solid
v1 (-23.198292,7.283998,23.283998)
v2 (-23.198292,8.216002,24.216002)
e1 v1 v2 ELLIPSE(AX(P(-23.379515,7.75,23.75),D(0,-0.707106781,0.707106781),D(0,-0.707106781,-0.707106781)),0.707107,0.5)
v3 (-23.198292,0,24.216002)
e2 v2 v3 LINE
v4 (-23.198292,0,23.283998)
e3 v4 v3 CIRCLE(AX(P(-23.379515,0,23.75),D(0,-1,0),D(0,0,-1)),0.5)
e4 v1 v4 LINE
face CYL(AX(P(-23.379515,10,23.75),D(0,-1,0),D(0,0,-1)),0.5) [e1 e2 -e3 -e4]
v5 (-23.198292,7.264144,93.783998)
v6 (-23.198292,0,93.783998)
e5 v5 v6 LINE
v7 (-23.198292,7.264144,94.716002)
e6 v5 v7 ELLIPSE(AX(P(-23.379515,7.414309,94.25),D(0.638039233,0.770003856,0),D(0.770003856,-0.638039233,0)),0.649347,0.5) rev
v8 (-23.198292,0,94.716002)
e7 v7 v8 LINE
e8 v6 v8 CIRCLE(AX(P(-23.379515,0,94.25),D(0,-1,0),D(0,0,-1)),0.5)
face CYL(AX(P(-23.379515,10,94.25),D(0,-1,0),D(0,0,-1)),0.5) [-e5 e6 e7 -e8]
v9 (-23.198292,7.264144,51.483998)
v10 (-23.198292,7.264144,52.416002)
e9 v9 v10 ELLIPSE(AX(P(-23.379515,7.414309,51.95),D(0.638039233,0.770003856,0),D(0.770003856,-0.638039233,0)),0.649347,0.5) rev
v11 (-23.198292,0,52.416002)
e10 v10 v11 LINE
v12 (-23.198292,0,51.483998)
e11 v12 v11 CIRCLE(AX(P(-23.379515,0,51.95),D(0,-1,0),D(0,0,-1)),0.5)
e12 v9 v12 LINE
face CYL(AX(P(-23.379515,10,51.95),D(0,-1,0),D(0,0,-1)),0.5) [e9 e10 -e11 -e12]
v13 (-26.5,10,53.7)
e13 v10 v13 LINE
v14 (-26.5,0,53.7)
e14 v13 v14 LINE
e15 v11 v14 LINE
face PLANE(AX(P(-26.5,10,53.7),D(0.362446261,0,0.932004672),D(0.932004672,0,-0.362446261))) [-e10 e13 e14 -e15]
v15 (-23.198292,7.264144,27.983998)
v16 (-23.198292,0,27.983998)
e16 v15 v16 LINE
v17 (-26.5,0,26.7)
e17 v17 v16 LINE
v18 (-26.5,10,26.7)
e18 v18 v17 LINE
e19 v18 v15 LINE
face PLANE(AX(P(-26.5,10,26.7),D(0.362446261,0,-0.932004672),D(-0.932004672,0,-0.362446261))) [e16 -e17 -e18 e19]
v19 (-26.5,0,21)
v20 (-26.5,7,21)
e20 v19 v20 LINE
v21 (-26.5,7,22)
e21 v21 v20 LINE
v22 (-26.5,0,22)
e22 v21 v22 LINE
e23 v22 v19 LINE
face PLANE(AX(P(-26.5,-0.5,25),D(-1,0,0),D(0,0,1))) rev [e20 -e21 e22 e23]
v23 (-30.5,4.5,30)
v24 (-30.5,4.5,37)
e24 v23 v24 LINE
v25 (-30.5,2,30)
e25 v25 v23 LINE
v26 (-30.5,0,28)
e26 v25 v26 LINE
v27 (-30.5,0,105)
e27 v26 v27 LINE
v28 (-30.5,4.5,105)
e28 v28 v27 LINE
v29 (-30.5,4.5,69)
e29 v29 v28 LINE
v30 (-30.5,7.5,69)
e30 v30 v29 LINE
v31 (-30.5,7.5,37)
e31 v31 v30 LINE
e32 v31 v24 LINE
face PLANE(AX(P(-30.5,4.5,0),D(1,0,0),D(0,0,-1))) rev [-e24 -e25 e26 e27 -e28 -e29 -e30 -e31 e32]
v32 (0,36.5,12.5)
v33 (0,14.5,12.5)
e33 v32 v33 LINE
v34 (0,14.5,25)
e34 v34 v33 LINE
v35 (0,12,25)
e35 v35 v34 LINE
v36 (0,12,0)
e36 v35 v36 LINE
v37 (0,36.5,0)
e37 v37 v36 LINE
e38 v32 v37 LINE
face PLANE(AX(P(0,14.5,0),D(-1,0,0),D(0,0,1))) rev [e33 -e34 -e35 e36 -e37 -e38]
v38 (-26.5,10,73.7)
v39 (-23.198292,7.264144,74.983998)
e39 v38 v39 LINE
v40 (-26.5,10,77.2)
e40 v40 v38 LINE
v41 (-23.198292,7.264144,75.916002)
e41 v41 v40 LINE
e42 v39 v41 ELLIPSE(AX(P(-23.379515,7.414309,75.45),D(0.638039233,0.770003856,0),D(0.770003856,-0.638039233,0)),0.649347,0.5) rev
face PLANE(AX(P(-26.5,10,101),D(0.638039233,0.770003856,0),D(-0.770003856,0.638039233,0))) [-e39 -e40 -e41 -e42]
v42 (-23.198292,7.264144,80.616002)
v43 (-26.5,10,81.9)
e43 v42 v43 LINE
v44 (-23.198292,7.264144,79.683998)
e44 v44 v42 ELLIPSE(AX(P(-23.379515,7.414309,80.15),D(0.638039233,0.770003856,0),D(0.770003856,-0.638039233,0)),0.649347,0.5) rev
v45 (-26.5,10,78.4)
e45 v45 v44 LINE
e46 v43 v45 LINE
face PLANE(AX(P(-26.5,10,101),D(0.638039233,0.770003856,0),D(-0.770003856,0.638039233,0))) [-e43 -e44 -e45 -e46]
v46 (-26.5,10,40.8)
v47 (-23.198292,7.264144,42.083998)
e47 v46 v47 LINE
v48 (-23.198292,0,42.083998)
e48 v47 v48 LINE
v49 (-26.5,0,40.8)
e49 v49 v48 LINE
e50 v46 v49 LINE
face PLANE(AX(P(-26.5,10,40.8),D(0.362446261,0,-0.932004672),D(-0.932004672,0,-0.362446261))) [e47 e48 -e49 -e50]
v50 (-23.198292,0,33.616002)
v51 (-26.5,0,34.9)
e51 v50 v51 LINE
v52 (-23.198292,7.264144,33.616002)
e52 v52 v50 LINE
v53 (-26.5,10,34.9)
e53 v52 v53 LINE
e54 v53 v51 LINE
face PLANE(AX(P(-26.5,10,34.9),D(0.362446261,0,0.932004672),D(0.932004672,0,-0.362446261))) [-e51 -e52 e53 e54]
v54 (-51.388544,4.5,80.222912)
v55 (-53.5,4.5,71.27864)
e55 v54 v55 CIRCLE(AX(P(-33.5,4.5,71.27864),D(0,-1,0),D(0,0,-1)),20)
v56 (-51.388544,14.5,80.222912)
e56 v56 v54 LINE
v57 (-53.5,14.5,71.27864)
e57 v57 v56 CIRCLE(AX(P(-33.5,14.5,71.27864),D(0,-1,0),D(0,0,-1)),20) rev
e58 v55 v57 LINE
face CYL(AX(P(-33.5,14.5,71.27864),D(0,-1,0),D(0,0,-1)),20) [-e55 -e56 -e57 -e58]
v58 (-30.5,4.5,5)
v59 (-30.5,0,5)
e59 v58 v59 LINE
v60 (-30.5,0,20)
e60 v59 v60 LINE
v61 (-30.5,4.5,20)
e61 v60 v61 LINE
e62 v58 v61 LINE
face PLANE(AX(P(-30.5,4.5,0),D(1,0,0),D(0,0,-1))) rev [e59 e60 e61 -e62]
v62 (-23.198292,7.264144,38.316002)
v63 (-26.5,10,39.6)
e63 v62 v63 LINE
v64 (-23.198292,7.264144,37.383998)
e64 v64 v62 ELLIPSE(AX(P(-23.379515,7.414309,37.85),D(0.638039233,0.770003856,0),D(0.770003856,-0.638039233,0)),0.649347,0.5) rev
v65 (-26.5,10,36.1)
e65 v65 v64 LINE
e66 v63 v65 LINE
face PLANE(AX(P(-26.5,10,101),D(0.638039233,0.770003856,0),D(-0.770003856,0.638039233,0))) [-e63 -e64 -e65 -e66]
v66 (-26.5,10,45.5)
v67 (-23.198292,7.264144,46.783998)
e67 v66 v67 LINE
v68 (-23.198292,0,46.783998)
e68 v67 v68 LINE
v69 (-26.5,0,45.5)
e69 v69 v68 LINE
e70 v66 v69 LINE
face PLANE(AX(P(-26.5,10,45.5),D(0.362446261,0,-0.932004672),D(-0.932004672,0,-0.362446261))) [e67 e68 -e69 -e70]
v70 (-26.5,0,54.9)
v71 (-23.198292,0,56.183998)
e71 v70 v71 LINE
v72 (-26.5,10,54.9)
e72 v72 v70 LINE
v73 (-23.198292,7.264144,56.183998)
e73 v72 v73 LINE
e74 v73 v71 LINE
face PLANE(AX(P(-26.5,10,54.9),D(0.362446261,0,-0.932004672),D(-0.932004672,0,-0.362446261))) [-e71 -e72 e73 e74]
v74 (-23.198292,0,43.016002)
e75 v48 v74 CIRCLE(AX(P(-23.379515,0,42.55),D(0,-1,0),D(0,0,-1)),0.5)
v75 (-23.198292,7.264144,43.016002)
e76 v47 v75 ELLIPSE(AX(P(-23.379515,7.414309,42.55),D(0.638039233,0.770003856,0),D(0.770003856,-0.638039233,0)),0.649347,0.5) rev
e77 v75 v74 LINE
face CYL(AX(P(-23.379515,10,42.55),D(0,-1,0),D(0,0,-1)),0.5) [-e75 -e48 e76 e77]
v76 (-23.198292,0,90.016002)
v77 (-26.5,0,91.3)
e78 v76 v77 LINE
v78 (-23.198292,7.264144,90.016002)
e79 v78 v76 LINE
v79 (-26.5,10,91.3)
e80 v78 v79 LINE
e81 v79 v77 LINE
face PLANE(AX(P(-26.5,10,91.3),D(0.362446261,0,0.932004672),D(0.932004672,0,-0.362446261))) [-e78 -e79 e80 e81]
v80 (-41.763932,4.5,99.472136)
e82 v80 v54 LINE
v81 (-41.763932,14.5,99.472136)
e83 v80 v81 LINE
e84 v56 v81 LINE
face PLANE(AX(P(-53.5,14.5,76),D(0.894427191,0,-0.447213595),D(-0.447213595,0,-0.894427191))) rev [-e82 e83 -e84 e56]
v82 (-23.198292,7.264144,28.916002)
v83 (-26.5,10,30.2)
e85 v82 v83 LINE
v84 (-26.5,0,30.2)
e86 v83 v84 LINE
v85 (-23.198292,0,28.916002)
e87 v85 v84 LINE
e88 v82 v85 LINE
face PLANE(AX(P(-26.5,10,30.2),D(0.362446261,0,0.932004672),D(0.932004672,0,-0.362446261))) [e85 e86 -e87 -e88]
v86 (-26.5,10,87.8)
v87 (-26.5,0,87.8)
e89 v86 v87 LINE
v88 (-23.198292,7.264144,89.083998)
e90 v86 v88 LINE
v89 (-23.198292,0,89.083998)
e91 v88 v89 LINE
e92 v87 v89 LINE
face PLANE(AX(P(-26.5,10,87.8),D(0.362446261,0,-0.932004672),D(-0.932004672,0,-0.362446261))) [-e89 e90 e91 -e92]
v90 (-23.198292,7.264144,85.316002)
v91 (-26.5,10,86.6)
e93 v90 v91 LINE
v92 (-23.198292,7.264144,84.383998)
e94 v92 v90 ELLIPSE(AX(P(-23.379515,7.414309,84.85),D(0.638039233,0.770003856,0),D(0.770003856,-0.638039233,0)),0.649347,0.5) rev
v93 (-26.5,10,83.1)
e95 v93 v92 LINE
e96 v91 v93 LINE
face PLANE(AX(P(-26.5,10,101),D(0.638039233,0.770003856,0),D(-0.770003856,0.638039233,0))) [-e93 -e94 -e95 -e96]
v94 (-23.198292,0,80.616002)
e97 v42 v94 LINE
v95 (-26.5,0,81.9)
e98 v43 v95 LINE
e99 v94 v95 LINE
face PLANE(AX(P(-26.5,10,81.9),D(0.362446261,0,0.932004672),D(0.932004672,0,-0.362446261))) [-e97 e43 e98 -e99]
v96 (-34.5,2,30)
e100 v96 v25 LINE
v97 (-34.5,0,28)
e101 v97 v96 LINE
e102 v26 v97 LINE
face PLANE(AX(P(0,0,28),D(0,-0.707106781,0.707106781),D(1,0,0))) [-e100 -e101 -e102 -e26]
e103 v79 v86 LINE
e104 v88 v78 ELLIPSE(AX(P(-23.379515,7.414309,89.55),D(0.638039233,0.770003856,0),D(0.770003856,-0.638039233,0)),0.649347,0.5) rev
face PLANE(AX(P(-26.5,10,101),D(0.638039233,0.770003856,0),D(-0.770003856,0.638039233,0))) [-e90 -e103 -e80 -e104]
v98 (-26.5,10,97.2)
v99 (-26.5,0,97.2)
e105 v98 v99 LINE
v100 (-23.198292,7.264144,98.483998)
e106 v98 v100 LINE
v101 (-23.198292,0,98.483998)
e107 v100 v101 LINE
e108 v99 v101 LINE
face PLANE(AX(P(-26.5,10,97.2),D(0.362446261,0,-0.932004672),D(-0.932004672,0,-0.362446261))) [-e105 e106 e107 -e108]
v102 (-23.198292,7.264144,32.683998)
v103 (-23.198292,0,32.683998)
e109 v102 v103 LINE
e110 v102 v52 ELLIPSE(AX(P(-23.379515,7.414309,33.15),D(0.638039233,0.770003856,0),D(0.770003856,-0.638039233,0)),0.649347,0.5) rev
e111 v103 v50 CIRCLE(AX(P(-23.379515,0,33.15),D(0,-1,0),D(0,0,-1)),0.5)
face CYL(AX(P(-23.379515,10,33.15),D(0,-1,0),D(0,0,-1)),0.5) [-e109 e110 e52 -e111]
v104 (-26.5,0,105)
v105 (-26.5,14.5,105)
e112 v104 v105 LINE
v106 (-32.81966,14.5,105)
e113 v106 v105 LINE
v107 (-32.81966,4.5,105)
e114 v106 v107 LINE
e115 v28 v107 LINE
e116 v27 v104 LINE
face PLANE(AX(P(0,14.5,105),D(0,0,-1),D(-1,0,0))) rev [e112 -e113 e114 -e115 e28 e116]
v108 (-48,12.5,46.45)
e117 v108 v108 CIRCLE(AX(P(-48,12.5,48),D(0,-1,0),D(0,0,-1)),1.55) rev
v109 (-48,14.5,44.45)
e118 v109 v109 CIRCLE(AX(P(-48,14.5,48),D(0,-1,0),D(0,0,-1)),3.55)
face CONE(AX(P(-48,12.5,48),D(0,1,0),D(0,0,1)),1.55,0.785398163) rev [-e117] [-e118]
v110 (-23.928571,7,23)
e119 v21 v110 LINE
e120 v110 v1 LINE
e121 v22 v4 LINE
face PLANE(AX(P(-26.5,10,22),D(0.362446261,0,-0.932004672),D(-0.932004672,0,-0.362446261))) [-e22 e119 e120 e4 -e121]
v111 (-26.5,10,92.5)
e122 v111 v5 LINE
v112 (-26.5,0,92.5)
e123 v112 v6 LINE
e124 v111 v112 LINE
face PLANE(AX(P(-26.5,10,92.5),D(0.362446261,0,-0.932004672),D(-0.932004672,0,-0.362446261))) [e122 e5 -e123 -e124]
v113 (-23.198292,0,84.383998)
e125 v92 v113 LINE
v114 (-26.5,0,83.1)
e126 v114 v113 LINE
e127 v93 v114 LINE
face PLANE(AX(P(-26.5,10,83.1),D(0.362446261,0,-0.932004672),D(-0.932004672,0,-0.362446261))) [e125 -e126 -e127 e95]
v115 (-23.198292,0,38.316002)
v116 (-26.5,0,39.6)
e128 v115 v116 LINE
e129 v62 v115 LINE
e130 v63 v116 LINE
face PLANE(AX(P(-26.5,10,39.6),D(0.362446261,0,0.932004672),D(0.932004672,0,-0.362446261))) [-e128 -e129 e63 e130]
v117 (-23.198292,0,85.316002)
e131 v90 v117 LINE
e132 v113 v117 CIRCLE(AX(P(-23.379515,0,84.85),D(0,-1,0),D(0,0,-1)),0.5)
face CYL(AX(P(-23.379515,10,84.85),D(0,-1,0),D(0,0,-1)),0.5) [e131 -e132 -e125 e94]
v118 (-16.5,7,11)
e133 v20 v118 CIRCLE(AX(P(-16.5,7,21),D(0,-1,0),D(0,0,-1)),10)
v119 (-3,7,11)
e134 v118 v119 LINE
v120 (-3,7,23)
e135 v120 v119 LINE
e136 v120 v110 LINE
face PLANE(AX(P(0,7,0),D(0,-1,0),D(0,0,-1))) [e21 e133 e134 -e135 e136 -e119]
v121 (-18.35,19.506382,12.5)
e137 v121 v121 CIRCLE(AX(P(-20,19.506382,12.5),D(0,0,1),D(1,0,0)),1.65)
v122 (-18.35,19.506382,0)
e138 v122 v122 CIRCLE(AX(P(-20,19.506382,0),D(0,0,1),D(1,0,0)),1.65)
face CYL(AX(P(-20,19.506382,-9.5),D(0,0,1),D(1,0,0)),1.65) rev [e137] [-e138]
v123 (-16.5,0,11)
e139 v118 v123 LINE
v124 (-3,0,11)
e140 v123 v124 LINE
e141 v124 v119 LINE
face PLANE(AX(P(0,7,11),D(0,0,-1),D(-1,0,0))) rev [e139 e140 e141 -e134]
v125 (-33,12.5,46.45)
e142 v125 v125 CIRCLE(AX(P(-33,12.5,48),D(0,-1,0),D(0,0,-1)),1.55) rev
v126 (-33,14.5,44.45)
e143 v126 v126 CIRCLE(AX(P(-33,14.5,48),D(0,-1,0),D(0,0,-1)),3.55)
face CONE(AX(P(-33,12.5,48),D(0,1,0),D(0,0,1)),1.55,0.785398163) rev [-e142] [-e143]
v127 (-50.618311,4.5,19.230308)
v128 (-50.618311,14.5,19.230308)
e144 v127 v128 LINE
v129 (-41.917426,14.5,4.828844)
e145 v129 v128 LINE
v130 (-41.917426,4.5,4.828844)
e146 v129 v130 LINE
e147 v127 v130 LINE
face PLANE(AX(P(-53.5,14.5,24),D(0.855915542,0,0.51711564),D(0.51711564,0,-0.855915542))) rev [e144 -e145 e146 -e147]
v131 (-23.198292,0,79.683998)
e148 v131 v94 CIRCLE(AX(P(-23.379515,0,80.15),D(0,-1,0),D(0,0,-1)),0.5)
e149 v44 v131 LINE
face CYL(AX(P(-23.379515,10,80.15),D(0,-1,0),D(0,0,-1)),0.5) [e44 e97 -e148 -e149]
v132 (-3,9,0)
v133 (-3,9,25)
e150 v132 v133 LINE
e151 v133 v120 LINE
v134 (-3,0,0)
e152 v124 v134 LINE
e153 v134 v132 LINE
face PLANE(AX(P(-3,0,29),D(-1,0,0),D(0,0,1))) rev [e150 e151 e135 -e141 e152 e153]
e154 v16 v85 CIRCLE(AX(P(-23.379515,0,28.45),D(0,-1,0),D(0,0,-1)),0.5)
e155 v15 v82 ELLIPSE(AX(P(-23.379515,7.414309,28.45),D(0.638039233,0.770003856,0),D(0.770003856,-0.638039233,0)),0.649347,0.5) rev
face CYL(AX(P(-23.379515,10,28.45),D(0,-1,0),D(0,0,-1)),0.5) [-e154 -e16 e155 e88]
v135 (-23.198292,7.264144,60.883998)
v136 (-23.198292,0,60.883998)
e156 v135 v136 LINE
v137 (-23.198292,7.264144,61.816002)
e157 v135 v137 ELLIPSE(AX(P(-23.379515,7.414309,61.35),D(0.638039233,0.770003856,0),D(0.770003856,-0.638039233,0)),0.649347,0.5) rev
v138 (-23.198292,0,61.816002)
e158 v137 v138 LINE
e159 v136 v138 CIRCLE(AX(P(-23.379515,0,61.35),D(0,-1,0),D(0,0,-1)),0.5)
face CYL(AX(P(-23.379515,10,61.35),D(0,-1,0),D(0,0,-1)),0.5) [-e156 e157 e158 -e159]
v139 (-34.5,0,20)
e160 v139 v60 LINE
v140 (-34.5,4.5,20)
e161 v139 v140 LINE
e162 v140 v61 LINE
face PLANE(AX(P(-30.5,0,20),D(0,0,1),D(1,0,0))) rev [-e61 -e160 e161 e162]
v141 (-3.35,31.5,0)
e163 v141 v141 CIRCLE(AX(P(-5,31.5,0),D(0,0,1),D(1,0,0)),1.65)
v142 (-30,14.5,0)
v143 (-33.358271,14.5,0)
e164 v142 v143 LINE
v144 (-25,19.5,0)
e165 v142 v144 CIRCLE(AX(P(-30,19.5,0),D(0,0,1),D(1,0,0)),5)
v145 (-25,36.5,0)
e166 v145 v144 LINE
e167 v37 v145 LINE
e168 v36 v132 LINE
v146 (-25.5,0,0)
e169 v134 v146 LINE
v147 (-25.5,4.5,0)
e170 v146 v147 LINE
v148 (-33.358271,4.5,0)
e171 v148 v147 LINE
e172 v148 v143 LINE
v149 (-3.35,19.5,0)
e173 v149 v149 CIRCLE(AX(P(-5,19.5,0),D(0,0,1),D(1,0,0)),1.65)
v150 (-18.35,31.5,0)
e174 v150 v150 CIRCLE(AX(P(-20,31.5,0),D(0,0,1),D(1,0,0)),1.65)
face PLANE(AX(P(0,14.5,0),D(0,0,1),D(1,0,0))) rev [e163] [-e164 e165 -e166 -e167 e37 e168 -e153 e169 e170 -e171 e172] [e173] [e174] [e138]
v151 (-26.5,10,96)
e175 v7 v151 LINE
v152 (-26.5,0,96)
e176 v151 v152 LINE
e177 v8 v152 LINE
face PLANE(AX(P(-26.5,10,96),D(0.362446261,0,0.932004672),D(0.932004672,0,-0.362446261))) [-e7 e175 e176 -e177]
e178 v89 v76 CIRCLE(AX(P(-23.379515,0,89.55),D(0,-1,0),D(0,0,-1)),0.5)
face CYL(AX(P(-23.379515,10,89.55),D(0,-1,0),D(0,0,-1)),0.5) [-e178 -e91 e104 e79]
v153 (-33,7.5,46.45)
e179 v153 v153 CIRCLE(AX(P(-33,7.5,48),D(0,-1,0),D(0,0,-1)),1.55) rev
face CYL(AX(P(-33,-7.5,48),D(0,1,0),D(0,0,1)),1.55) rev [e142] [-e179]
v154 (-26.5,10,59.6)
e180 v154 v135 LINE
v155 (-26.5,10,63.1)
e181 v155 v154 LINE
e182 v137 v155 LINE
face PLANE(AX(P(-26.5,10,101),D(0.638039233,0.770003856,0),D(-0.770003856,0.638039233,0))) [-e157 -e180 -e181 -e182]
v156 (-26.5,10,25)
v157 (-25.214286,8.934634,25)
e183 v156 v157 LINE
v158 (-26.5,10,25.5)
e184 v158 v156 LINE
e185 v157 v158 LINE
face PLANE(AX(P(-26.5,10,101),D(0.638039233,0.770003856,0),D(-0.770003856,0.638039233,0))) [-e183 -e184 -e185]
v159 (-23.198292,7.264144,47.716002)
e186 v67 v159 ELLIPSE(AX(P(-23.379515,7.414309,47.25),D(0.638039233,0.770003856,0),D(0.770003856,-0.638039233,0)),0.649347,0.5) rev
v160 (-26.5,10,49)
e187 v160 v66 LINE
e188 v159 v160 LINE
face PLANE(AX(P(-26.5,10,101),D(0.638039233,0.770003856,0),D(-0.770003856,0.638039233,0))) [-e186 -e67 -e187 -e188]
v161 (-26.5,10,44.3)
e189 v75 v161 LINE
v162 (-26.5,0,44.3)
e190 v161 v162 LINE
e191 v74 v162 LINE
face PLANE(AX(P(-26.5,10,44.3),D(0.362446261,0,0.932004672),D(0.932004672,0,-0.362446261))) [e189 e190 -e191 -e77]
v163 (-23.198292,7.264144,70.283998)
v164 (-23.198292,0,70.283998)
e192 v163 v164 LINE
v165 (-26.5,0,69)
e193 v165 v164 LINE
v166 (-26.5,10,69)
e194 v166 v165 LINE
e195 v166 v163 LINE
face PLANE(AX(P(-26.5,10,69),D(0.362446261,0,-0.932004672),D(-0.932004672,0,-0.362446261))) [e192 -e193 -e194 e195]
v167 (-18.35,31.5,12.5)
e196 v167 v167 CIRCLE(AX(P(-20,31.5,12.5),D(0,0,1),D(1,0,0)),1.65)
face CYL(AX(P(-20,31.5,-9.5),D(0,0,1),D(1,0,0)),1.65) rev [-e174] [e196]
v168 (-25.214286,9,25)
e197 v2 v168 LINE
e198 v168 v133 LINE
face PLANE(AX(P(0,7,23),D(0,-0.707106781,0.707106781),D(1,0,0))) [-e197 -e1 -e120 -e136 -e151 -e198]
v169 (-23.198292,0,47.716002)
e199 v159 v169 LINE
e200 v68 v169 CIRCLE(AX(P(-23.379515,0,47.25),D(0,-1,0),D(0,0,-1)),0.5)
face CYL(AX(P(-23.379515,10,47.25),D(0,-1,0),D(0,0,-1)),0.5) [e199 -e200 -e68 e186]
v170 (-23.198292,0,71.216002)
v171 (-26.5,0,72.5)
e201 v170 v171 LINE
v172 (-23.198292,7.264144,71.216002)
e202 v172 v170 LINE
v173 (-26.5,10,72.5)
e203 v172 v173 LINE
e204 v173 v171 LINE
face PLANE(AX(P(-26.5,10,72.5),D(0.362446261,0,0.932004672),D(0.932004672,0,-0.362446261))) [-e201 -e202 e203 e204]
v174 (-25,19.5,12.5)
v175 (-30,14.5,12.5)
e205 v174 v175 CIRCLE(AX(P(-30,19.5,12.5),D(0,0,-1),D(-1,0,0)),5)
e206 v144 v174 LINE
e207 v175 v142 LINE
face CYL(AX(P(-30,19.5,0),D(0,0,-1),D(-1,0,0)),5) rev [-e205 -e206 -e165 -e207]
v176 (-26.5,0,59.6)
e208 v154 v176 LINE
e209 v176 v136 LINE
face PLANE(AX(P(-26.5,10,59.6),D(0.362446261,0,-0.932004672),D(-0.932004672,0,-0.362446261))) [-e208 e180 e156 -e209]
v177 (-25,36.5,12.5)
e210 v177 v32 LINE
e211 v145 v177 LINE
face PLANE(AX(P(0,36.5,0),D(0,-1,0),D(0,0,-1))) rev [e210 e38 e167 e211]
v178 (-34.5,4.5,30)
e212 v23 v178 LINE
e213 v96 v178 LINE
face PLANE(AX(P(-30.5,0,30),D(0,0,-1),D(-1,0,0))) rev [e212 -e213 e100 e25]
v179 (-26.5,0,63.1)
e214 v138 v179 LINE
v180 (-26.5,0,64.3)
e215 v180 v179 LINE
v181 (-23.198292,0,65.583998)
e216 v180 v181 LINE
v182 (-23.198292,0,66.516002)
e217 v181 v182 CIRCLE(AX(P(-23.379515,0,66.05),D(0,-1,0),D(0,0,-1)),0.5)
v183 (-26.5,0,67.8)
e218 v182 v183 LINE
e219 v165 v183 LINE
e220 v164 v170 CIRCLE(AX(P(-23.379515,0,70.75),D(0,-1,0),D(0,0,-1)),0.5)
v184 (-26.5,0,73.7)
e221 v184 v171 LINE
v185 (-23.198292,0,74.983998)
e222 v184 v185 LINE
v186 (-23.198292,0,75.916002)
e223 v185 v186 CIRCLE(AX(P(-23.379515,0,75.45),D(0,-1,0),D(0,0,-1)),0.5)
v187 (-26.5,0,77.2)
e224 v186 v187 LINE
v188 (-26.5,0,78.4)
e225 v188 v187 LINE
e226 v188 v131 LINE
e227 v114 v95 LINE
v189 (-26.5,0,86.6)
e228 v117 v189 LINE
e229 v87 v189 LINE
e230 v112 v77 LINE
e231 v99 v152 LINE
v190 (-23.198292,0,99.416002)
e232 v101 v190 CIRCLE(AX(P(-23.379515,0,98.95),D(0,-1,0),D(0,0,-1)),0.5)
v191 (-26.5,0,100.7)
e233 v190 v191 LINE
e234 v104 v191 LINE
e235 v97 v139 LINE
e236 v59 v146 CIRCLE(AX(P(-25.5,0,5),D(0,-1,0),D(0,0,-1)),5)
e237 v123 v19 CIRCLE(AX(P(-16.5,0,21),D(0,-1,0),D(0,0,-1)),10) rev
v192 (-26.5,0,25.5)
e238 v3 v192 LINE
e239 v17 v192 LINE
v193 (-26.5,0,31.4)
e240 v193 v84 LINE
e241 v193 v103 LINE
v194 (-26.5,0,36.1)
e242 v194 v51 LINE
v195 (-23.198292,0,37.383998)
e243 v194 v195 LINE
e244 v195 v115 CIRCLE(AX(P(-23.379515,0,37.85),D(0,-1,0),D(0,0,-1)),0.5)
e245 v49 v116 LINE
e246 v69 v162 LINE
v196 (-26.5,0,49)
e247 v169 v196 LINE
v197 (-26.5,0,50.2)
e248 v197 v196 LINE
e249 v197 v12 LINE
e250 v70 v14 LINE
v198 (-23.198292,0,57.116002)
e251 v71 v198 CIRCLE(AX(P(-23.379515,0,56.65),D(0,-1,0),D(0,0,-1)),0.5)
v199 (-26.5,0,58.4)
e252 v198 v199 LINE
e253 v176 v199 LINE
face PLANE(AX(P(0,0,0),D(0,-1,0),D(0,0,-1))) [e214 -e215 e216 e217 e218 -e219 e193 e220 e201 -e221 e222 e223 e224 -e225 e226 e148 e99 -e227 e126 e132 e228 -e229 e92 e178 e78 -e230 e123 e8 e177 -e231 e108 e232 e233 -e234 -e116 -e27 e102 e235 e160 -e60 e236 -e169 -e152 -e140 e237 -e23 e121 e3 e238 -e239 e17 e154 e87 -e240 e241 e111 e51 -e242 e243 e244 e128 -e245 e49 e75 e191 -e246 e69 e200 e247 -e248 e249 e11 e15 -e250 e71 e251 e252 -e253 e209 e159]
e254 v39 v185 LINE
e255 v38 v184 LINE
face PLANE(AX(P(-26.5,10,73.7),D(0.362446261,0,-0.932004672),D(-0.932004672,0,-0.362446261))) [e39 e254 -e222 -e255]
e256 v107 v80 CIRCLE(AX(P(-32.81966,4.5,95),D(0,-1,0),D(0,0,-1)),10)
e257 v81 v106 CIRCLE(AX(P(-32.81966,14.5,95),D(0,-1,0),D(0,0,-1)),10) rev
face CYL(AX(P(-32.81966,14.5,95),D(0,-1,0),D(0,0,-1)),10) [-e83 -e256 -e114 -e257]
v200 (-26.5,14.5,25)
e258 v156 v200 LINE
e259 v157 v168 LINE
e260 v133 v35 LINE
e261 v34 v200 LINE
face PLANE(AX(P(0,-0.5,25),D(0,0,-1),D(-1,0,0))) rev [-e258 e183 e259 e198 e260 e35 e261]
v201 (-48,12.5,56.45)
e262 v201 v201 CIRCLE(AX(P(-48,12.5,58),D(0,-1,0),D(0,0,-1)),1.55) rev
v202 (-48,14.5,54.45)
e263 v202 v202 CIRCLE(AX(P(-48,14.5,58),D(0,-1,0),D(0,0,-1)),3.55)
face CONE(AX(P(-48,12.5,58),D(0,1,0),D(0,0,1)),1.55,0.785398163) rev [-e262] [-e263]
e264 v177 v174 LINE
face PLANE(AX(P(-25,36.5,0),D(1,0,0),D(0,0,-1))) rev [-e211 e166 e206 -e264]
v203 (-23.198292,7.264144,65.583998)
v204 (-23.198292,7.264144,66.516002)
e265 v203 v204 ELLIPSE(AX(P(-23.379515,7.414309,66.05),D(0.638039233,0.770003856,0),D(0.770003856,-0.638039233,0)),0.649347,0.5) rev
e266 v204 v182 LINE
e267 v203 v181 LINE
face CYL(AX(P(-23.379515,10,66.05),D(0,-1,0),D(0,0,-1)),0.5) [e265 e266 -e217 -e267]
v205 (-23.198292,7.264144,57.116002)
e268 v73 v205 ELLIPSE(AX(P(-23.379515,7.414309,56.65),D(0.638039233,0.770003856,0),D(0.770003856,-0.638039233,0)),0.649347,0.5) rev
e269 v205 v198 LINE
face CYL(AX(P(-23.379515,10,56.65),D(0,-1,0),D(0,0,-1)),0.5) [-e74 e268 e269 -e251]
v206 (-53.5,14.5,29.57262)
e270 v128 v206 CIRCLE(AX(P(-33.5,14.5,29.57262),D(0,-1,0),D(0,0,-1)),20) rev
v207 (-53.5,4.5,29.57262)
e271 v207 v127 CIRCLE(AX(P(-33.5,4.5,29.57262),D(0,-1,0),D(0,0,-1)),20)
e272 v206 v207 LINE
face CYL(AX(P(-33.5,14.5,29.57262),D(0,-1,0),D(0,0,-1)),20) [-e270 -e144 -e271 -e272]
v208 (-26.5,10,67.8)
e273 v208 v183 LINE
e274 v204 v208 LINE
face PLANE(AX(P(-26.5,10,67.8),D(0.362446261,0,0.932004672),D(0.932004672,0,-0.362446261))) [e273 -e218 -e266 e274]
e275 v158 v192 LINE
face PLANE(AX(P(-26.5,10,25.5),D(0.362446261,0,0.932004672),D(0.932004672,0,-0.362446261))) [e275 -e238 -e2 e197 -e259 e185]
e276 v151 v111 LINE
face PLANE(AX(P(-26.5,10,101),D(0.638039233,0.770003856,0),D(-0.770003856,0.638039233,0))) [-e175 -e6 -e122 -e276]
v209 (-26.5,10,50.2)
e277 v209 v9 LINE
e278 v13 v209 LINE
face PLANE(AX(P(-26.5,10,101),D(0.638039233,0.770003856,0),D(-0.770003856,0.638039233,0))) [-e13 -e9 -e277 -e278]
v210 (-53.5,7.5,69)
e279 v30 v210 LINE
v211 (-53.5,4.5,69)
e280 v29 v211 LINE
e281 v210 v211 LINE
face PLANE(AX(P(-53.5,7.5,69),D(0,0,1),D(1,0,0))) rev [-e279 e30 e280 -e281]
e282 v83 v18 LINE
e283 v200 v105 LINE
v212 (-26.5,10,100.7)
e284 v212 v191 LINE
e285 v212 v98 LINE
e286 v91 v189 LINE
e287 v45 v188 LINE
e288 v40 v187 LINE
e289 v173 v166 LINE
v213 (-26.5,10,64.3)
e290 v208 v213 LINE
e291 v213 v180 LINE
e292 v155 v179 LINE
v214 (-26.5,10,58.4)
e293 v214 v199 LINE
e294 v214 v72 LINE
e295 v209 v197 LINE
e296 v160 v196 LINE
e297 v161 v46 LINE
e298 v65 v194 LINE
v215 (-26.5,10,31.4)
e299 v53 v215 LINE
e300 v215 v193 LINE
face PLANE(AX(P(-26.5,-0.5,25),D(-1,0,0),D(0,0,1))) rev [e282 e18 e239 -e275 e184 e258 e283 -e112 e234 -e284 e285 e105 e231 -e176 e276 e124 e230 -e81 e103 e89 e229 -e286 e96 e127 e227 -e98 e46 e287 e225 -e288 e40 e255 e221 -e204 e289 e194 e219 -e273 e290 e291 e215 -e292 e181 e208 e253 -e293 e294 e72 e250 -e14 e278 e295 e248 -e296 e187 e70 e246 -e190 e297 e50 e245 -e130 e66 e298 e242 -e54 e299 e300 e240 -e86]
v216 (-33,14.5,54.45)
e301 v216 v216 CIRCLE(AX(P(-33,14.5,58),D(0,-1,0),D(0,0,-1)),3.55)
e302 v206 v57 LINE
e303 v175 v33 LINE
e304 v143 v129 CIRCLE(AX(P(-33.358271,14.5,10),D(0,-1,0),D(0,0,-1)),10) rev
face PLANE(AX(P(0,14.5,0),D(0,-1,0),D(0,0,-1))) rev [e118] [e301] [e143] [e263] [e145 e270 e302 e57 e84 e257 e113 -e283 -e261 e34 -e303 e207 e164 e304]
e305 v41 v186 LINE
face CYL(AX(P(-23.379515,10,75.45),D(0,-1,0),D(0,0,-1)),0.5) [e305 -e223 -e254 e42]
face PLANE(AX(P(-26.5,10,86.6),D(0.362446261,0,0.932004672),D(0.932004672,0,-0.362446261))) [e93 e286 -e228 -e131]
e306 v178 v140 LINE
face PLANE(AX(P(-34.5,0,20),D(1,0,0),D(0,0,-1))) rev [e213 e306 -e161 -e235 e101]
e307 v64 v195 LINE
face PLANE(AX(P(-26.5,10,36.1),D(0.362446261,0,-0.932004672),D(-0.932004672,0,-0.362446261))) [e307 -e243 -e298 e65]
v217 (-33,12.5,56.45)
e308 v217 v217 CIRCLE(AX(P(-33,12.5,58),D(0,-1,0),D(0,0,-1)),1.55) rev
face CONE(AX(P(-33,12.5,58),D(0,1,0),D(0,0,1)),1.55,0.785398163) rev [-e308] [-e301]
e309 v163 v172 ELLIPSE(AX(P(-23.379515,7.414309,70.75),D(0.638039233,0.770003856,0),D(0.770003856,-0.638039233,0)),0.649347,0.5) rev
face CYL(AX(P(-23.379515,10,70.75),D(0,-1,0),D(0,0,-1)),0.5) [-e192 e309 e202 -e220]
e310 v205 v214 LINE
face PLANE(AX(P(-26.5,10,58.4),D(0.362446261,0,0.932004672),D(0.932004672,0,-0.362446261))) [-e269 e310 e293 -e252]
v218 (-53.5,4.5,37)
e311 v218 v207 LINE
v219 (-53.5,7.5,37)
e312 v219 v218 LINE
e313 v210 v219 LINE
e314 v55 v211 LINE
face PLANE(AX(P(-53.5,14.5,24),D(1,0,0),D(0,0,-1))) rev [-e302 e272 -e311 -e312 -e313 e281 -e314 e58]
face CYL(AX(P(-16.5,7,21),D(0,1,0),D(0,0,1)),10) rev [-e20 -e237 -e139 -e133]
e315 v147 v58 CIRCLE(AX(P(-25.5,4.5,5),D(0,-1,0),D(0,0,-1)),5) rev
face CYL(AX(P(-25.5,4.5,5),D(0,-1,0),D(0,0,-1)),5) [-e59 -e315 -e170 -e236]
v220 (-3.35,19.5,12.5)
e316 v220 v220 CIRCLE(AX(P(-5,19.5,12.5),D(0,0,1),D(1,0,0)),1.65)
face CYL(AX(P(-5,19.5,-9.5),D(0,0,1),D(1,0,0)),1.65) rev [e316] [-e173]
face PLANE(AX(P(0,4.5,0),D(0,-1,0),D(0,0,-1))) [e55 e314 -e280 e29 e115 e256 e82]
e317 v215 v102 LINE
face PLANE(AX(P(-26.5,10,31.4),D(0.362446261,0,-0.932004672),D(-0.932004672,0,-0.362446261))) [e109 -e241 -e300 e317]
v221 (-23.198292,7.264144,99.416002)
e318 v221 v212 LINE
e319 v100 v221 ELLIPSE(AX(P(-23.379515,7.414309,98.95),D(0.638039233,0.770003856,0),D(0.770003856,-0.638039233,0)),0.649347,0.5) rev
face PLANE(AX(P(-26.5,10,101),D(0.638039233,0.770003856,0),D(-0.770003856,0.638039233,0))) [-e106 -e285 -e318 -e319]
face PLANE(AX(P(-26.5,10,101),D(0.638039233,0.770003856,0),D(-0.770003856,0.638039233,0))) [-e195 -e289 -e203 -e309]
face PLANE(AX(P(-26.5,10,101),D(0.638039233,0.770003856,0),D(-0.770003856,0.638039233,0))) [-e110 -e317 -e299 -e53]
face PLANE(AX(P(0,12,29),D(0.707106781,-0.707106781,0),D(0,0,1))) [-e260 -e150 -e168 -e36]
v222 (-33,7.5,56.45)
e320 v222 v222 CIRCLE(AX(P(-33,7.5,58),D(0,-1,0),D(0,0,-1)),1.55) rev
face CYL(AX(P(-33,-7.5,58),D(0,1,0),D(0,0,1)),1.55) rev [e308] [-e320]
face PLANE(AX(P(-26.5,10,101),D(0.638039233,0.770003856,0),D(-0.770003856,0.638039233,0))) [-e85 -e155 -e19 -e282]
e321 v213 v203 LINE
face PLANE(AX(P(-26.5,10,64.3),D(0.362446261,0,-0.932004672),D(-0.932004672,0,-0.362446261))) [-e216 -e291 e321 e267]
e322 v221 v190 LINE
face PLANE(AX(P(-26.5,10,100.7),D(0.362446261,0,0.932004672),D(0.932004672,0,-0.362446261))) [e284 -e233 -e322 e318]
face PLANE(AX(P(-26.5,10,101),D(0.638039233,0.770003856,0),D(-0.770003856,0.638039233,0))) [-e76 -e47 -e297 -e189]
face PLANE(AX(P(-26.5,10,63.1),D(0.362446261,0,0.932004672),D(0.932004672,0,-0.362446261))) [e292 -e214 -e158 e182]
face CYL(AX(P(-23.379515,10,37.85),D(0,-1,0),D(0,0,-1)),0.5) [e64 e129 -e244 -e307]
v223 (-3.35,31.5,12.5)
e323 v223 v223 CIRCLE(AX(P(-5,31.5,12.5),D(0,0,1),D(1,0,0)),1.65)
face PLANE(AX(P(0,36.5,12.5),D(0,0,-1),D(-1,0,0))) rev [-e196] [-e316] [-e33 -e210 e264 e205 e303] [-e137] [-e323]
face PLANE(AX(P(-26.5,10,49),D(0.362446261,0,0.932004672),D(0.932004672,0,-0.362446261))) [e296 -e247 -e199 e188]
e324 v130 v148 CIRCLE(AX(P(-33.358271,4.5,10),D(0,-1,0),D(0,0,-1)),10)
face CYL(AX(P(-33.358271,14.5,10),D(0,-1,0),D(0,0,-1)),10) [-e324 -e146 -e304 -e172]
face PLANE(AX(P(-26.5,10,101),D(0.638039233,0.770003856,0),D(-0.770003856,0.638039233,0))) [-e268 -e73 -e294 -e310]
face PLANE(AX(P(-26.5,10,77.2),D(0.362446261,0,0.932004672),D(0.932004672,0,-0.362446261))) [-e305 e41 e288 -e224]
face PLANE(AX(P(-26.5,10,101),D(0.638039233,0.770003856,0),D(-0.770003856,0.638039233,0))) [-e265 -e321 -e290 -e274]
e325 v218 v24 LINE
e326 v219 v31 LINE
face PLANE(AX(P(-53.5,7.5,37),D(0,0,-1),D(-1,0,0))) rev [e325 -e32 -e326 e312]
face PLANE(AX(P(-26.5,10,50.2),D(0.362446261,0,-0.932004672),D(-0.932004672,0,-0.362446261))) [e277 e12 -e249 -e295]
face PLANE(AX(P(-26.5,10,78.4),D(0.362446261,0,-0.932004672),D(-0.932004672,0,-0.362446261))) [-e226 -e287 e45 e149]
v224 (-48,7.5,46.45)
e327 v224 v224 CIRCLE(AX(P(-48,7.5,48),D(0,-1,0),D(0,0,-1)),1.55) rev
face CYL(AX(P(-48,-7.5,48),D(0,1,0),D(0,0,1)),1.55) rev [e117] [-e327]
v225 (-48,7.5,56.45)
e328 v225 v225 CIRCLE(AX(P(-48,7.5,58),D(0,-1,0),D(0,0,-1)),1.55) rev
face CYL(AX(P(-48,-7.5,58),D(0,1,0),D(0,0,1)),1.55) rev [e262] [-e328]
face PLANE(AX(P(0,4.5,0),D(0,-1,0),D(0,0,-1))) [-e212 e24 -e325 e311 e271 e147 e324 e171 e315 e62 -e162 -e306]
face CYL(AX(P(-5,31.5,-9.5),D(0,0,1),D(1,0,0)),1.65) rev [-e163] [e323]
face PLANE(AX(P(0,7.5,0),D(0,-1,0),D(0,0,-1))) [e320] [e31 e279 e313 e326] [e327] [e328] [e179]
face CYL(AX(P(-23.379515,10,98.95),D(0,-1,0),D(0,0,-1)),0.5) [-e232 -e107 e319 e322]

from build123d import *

# Parameters (mm, degrees)
BOSS_EXTRUDE1_DEPTH = 14.5
SKETCH2_W           = 26.5
SKETCH2_H           = 80
CUT_EXTRUDE1_DEPTH  = 15
SKETCH4_W           = 26.5
SKETCH4_H           = 14
CUT_EXTRUDE2_DEPTH  = 7
FILLET1_R           = 10
SKETCH5_W           = 3
SKETCH5_H           = 12
CUT_EXTRUDE3_DEPTH  = 29
CHAMFER1_SIZE       = 3
CHAMFER2_SIZE       = 2
BOSS_EXTRUDE2_DEPTH = 10
LPATTERN1_COUNT     = 17
LPATTERN1_PITCH     = 4.7
CUT_EXTRUDE4_DEPTH  = 76
SKETCH8_W           = 33.454520386
SKETCH8_H           = 107.037620526
CUT_EXTRUDE5_DEPTH  = 4.5
FILLET2_R           = 20
FILLET3_R           = 10
SKETCH9_W           = 25
SKETCH9_H           = 12.5
BOSS_EXTRUDE3_DEPTH = 22
FILLET4_R           = 5
SKETCH10_R          = 1.65
CUT_EXTRUDE6_DEPTH  = 22
SKETCH12_R          = 1.55
CUT_EXTRUDE7_DEPTH  = 22
CHAMFER3_SIZE       = 2
SKETCH13_W          = 23
SKETCH13_H          = 32
CUT_EXTRUDE8_DEPTH  = 3
FILLET5_R           = 5
SKETCH14_W          = 4
SKETCH14_H          = 10
BOSS_EXTRUDE4_DEPTH = 4.5
CHAMFER4_SIZE       = 2


with BuildPart() as part:
    # Sketch1 → Boss-Extrude1 (new body)
    with BuildSketch(Plane(origin=(0, 0, 0), x_dir=(1, 0, 0), z_dir=(0, 1, 0))):
        Polygon((-53.5, -24), (-39, 0), (0, 0), (0, -105), (-39, -105), (-53.5, -76), align=None)
    extrude(amount=BOSS_EXTRUDE1_DEPTH)

    # Sketch2 → Cut-Extrude1 (cut)
    with BuildSketch(Plane(origin=(0, 14.5, 0), x_dir=(1, 0, 0), z_dir=(0, 1, 0))):
        with Locations((-13.25, -65)):
            Rectangle(SKETCH2_W, SKETCH2_H)
    extrude(amount=-CUT_EXTRUDE1_DEPTH, mode=Mode.SUBTRACT)

    # Sketch4 → Cut-Extrude2 (cut)
    with BuildSketch(Plane.XZ):
        with Locations((-13.25, 18)):
            Rectangle(SKETCH4_W, SKETCH4_H)
    extrude(amount=-CUT_EXTRUDE2_DEPTH, mode=Mode.SUBTRACT)

    # Fillet1
    fillet1_edges = [part.edges().sort_by_distance(p)[0] for p in [
        (-26.5, 3.5, 11),
    ]]
    fillet(fillet1_edges, radius=FILLET1_R)

    # Sketch5 → Cut-Extrude3 (cut)
    with BuildSketch(Plane(origin=(0, 0, 0), x_dir=(-1, 0, 0), z_dir=(0, 0, -1))):
        with Locations((1.5, 6)):
            Rectangle(SKETCH5_W, SKETCH5_H)
    extrude(amount=-CUT_EXTRUDE3_DEPTH, mode=Mode.SUBTRACT)

    # Chamfer1
    chamfer1_edges = [part.edges().sort_by_distance(p)[0] for p in [
        (-3, 12, 12.5),
    ]]
    chamfer(chamfer1_edges, length=CHAMFER1_SIZE - 0.0001)  # a hair under: the kernel refuses the full size

    # Chamfer2
    chamfer2_edges = [part.edges().sort_by_distance(p)[0] for p in [
        (-14.75, 7, 25),
    ]]
    chamfer(chamfer2_edges, length=CHAMFER2_SIZE)

    # Sketch6 → Boss-Extrude2 (add)
    with BuildSketch(Plane.XZ):
        with BuildLine():
            Line((-26.5, 25.5), (-26.5, 22))
            Line((-26.5, 22), (-23.198291721, 23.283997664))
            ThreePointArc((-23.198291721, 23.283997664), (-22.879514851, 23.75), (-23.198291721, 24.216002336))
            Line((-23.198291721, 24.216002336), (-26.5, 25.5))
        make_face()
    boss_extrude2 = extrude(amount=-BOSS_EXTRUDE2_DEPTH)

    # LPattern1: Boss-Extrude2 ×17
    with Locations(*[(0, 0, i * LPATTERN1_PITCH) for i in range(1, LPATTERN1_COUNT)]):
        add(boss_extrude2)

    # Sketch7 → Cut-Extrude4 (cut)
    with BuildSketch(Plane.XY.offset(25)):
        Polygon((-26.5, 10), (-22.879514851, 7), (-22.879514851, 10), align=None)
    extrude(amount=CUT_EXTRUDE4_DEPTH, mode=Mode.SUBTRACT)

    # Sketch8 → Cut-Extrude5 (cut)
    with BuildSketch(Plane.XZ):
        with Locations((-47.227260193, 53.518810263)):
            Rectangle(SKETCH8_W, SKETCH8_H)
    extrude(amount=-CUT_EXTRUDE5_DEPTH, mode=Mode.SUBTRACT)

    # Fillet2
    fillet2_edges = [part.edges().sort_by_distance(p)[0] for p in [
        (-53.5, 9.5, 76),
        (-53.5, 9.5, 24),
    ]]
    fillet(fillet2_edges, radius=FILLET2_R)

    # Fillet3
    fillet3_edges = [part.edges().sort_by_distance(p)[0] for p in [
        (-39, 9.5, 105),
        (-39, 9.5, 0),
    ]]
    fillet(fillet3_edges, radius=FILLET3_R)

    # Sketch9 → Boss-Extrude3 (add)
    with BuildSketch(Plane(origin=(0, 14.5, 0), x_dir=(1, 0, 0), z_dir=(0, 1, 0))):
        with Locations((-12.5, -6.25)):
            Rectangle(SKETCH9_W, SKETCH9_H)
    extrude(amount=BOSS_EXTRUDE3_DEPTH)

    # Fillet4
    fillet4_edges = [part.edges().sort_by_distance(p)[0] for p in [
        (-25, 14.5, 6.25),
    ]]
    fillet(fillet4_edges, radius=FILLET4_R)

    # Sketch10 → Cut-Extrude6 (cut)
    with BuildSketch(Plane.XY.offset(12.5)):
        with Locations((-20, 31.5)):
            Circle(SKETCH10_R)
        with Locations((-5, 31.5)):
            Circle(SKETCH10_R)
        with Locations((-5, 19.5)):
            Circle(SKETCH10_R)
        with Locations((-20, 19.506382114)):
            Circle(SKETCH10_R)
    extrude(amount=-CUT_EXTRUDE6_DEPTH, mode=Mode.SUBTRACT)

    # Sketch12 → Cut-Extrude7 (cut)
    with BuildSketch(Plane(origin=(0, 14.5, 0), x_dir=(1, 0, 0), z_dir=(0, 1, 0))):
        with Locations(Location((-48, -48, 0), (0, 0, 270))):
            Circle(SKETCH12_R)
        with Locations(Location((-33, -48, 0), (0, 0, 270))):
            Circle(SKETCH12_R)
        with Locations(Location((-48, -58, 0), (0, 0, 270))):
            Circle(SKETCH12_R)
        with Locations(Location((-33, -58, 0), (0, 0, 270))):
            Circle(SKETCH12_R)
    extrude(amount=-CUT_EXTRUDE7_DEPTH, mode=Mode.SUBTRACT)

    # Chamfer3
    chamfer3_edges = [part.edges().sort_by_distance(p)[0] for p in [
        (-33, 14.5, 46.45),
        (-48, 14.5, 56.45),
        (-33, 14.5, 56.45),
        (-48, 14.5, 46.45),
    ]]
    chamfer(chamfer3_edges, length=CHAMFER3_SIZE)

    # Sketch13 → Cut-Extrude8 (cut)
    with BuildSketch(Plane.XZ.offset(-4.5)):
        with Locations((-42, 53)):
            Rectangle(SKETCH13_W, SKETCH13_H)
    extrude(amount=-CUT_EXTRUDE8_DEPTH, mode=Mode.SUBTRACT)

    # Fillet5
    fillet5_edges = [part.edges().sort_by_distance(p)[0] for p in [
        (-30.5, 2.25, 0),
    ]]
    fillet(fillet5_edges, radius=FILLET5_R)

    # Sketch14 → Boss-Extrude4 (add)
    with BuildSketch(Plane.XZ.offset(-4.5)):
        with Locations((-32.5, 25)):
            Rectangle(SKETCH14_W, SKETCH14_H)
    extrude(amount=BOSS_EXTRUDE4_DEPTH)

    # Chamfer4
    chamfer4_edges = [part.edges().sort_by_distance(p)[0] for p in [
        (-32.5, 0, 30),
    ]]
    chamfer(chamfer4_edges, length=CHAMFER4_SIZE)


solid = part.part
